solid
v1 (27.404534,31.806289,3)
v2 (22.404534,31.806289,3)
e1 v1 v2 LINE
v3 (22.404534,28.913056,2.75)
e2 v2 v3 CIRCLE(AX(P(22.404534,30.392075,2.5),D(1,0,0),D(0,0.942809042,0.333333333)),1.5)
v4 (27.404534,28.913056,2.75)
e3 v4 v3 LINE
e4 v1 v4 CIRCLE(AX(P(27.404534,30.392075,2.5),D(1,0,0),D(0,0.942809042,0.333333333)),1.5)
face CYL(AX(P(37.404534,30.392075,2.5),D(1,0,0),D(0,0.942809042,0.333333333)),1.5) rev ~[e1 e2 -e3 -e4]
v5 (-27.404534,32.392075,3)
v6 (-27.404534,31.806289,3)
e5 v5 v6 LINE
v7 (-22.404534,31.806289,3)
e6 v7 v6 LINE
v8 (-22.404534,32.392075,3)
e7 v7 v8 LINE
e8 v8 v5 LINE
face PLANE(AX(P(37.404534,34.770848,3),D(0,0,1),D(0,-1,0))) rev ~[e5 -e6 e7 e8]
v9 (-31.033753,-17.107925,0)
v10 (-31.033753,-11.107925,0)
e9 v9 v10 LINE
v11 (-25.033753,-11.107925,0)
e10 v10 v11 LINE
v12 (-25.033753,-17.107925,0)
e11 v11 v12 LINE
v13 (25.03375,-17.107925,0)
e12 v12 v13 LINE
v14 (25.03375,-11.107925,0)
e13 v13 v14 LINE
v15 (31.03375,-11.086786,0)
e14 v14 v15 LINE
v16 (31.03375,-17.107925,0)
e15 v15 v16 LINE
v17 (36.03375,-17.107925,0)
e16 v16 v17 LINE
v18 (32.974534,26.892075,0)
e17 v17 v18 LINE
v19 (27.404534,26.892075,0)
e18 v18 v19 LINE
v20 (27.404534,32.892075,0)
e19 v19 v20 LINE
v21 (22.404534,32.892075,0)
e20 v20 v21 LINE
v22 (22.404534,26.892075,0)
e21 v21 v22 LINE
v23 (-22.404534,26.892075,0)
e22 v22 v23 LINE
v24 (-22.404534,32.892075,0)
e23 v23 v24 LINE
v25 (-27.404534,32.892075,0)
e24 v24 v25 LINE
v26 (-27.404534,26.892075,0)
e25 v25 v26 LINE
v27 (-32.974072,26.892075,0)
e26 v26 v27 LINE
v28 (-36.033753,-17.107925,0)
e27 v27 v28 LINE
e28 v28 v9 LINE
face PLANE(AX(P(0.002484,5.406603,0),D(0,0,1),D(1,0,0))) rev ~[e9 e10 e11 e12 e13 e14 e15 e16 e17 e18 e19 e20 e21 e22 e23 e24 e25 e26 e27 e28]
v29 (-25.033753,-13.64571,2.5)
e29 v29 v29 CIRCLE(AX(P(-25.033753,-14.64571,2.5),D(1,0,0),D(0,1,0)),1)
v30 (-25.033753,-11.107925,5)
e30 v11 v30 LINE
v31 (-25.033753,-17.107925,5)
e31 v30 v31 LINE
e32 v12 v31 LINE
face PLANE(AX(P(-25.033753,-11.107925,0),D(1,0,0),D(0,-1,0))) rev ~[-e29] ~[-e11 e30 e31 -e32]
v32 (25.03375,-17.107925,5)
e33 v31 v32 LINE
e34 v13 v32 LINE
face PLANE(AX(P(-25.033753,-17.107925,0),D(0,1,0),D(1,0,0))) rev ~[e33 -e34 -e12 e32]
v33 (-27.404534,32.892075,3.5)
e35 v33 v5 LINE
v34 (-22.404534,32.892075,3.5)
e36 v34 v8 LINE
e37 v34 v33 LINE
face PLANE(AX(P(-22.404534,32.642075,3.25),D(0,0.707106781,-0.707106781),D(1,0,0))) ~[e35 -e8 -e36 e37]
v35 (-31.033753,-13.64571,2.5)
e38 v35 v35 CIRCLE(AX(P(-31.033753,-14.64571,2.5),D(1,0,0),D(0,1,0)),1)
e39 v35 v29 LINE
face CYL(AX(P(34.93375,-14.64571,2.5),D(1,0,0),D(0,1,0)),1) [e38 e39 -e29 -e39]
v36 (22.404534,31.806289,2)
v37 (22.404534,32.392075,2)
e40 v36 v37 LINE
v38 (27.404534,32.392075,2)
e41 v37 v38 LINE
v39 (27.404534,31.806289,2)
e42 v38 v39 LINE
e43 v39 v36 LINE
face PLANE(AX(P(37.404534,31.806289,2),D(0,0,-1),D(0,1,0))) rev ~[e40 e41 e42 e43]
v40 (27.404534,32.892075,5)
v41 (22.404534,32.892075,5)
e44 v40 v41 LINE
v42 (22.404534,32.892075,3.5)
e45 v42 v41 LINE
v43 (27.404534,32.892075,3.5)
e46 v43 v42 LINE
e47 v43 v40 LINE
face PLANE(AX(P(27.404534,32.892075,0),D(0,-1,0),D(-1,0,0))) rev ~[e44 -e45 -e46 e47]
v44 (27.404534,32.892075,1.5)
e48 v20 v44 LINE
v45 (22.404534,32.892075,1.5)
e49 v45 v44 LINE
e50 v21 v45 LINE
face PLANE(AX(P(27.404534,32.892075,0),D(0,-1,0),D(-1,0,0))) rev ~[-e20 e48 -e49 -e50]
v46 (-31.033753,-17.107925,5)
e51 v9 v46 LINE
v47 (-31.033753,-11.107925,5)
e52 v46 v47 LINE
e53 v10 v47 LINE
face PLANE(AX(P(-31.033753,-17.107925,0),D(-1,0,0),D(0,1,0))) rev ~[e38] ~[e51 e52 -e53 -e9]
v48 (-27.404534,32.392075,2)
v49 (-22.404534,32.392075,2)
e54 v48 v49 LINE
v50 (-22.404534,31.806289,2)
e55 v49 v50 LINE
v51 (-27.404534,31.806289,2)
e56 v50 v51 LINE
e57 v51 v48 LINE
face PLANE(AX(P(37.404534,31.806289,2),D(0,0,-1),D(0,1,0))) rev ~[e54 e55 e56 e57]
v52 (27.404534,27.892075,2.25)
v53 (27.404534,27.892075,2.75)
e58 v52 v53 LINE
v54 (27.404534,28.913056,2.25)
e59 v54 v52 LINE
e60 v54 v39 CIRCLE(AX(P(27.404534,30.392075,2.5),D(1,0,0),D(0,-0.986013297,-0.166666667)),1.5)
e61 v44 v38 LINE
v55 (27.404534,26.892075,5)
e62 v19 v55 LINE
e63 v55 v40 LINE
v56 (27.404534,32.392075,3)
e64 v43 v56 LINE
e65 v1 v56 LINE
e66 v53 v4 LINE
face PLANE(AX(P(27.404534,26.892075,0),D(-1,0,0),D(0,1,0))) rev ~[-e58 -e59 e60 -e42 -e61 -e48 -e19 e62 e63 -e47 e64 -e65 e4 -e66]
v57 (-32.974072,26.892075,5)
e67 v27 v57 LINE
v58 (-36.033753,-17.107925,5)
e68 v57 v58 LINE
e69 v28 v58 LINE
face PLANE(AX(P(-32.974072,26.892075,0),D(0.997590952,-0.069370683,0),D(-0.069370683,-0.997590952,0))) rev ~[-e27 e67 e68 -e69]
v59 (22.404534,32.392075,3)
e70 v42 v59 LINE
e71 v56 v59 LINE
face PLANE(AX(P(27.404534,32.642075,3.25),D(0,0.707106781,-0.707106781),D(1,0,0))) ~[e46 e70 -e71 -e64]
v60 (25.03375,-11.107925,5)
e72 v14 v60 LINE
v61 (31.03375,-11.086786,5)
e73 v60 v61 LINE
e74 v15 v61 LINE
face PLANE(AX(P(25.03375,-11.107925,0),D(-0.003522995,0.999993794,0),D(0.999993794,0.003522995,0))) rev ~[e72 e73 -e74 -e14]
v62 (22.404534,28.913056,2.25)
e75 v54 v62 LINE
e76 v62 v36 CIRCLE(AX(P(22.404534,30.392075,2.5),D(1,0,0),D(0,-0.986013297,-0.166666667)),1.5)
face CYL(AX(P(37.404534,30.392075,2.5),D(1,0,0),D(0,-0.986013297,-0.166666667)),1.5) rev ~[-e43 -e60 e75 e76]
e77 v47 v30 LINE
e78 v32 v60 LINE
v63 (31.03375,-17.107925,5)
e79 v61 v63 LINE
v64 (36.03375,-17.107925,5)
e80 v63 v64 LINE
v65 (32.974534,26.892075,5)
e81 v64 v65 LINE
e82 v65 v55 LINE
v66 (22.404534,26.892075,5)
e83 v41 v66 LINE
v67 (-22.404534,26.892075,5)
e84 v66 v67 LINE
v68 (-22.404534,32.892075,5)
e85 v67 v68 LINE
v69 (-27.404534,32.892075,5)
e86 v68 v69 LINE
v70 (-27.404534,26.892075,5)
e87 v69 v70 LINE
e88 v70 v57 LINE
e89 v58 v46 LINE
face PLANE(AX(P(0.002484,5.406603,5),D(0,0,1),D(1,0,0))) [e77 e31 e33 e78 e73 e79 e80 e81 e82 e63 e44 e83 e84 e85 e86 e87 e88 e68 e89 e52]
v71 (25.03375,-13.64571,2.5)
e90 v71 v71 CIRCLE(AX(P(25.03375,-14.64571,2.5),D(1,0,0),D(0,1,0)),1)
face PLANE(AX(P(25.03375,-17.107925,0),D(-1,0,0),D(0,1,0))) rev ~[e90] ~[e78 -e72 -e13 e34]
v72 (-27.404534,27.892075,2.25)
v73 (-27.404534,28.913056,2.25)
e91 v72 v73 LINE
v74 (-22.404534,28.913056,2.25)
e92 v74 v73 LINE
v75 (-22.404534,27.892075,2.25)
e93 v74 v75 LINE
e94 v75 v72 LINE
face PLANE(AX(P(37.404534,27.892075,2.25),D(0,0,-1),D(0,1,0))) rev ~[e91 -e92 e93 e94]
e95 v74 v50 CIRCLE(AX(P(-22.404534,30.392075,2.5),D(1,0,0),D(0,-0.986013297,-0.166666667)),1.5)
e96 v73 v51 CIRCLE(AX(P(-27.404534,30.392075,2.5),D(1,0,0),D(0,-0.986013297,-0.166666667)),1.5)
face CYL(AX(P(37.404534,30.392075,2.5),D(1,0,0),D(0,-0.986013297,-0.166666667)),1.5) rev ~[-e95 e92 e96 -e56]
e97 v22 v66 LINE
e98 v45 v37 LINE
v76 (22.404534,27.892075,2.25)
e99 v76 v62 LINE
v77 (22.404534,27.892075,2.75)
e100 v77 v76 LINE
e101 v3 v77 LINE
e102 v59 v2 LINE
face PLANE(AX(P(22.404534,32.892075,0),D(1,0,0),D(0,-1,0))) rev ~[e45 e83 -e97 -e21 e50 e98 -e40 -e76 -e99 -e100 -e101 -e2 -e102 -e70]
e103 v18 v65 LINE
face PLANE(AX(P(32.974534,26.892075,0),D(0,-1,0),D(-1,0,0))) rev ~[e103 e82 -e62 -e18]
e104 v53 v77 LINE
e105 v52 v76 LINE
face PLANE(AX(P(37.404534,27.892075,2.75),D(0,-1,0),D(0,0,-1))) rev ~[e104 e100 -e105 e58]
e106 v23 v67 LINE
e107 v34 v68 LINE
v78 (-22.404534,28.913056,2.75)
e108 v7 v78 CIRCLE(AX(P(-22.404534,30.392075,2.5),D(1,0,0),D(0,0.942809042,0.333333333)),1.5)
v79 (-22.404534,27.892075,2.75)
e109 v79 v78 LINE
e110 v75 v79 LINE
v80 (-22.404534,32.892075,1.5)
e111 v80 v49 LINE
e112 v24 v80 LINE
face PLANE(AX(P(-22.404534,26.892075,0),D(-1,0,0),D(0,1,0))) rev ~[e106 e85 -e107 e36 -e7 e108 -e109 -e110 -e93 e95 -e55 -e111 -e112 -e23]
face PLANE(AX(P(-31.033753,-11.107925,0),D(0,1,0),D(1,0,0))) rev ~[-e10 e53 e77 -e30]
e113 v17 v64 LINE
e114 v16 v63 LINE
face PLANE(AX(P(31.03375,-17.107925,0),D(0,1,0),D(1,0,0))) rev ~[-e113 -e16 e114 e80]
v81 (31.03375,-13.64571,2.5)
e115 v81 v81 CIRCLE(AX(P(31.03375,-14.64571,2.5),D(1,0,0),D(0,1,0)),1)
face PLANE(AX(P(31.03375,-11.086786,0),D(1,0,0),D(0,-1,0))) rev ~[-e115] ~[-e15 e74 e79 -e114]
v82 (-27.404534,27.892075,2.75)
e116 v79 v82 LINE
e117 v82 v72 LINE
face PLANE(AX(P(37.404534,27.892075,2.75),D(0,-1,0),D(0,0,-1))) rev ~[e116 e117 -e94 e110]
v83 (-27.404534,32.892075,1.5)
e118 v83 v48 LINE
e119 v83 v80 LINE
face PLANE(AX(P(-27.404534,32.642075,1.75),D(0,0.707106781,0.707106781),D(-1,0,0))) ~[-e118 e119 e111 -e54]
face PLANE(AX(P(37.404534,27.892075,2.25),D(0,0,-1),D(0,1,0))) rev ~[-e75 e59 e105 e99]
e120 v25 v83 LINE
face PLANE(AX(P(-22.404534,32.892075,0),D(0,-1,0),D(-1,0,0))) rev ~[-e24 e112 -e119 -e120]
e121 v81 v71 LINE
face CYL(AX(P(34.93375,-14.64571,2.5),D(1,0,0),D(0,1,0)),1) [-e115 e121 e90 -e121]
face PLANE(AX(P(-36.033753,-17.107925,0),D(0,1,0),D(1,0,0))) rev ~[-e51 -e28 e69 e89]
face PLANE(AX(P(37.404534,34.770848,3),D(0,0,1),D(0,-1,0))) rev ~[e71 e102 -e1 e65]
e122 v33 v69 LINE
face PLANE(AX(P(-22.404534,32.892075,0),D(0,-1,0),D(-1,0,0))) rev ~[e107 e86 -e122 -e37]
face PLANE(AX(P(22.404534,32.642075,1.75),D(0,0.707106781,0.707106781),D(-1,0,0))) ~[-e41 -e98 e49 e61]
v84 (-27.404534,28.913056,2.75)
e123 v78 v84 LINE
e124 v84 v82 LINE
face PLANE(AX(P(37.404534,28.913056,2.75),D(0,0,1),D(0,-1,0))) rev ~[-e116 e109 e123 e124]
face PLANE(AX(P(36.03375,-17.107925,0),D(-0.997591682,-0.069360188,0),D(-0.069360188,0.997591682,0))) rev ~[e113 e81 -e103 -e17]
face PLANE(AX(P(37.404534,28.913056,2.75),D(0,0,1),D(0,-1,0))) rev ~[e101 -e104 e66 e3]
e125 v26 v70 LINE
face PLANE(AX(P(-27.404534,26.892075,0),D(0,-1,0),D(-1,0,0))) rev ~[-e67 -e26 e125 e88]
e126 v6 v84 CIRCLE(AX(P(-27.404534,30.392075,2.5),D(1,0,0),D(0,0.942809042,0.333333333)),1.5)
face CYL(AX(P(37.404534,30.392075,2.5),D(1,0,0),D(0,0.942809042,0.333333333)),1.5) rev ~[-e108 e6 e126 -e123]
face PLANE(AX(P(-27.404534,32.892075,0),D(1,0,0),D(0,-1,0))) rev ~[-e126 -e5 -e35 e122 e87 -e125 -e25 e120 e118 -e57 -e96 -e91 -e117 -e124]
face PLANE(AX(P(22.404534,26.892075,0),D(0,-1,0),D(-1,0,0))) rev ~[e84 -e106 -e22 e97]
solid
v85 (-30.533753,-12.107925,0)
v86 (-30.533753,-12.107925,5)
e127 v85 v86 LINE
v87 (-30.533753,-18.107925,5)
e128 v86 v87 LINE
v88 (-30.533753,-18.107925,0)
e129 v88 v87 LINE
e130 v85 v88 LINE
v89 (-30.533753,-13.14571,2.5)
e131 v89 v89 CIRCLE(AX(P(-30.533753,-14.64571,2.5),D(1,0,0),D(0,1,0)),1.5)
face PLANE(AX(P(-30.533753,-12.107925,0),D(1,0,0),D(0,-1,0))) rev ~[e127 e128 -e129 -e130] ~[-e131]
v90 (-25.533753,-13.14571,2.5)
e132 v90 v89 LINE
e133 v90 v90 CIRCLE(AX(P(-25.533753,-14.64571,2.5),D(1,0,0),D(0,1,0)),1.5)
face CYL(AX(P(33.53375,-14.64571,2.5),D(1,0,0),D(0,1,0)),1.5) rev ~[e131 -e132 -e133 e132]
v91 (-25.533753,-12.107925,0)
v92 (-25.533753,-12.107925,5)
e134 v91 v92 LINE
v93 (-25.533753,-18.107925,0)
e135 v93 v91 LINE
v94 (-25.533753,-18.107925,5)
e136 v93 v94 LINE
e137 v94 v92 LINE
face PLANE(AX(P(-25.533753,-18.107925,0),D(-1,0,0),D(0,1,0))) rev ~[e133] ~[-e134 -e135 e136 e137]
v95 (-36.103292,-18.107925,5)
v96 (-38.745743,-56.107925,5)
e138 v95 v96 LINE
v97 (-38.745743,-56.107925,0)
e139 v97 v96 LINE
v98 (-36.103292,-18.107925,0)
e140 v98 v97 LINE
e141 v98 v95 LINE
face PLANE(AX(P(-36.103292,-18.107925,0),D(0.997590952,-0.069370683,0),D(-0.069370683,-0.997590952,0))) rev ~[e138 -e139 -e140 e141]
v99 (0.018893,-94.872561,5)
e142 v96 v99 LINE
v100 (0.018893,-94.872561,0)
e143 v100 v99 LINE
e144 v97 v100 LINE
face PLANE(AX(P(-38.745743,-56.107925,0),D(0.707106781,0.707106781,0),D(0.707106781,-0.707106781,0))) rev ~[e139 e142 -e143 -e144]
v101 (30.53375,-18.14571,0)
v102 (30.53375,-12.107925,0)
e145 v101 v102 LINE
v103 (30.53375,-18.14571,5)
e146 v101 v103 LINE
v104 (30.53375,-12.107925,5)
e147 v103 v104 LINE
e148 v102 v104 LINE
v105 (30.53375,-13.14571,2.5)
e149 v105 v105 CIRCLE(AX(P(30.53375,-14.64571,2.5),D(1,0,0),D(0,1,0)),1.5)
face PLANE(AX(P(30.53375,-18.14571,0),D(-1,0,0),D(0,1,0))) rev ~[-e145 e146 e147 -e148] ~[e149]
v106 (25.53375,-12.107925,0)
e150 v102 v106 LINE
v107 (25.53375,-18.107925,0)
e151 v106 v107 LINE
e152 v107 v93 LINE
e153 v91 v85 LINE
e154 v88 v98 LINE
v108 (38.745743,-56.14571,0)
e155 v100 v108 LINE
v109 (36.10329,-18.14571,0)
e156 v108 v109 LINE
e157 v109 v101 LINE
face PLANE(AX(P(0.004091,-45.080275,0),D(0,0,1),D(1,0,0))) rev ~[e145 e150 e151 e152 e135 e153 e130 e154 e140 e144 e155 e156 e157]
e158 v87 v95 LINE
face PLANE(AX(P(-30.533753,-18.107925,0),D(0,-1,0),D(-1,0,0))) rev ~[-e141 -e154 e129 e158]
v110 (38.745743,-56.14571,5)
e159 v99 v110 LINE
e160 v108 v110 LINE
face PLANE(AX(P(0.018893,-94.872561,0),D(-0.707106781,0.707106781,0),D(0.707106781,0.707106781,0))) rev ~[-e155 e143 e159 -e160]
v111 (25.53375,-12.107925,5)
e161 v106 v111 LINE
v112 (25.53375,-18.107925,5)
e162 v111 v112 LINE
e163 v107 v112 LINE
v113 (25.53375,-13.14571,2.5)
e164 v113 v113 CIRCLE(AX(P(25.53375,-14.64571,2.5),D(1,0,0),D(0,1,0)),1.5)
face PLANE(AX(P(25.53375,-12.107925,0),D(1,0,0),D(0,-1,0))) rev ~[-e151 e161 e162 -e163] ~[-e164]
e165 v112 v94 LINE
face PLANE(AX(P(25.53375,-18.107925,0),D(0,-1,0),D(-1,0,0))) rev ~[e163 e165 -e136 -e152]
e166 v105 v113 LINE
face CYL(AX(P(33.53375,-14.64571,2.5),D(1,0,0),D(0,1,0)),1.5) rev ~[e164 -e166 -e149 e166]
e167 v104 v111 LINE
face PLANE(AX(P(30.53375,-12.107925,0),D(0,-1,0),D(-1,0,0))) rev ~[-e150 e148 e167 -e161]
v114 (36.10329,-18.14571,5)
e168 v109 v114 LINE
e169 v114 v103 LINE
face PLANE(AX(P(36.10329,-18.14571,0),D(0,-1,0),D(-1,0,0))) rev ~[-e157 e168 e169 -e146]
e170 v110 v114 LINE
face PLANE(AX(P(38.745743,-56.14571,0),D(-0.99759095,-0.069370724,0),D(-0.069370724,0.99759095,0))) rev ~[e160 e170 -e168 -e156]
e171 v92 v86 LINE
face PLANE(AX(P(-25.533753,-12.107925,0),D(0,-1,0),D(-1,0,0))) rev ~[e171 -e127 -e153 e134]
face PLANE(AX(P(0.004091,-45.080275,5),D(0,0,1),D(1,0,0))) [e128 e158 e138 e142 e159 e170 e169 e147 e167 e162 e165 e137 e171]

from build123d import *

# Parameters (mm, degrees)
F1_DEPTH = 5
F4_DEPTH = 72.8
F5_SIZE  = 0.5
F8_START = -7
F7_R     = 1.5
F7_R_2   = 1
F8_DEPTH = 68.5
F9_START = -5.6
F9_DEPTH = 68.7


with BuildPart() as f1:
    # F0 (on Top) → F1 (new body)
    with BuildSketch(Plane.XY):
        Polygon((-36.1032915569, -18.1079245215), (-38.7457432998, -56.1079245215), (0.0188927832, -94.8725606045), (38.7457432998, -56.145710088), (36.10329, -18.1457101963), (30.53375, -18.1457101963), (30.53375, -12.1079245215), (25.53375, -12.1079245215), (25.53375, -17.1079245215), (25.53375, -18.1079245215), (-25.5337533532, -18.1079245215), (-25.5337533532, -12.1079245215), (-30.5337533532, -12.1079245215), (-30.5337533532, -18.1079245215), align=None)
    extrude(amount=F1_DEPTH)

    # F7 (on offset) → F8 (cut)
    with BuildSketch(Plane.YZ.offset(40.53375).offset(F8_START)):
        with Locations((-14.6457101963, 2.5)):
            Circle(F7_R)
        with Locations((-14.6457101963, 2.5)):
            Circle(F7_R_2, mode=Mode.SUBTRACT)
    extrude(amount=-F8_DEPTH, mode=Mode.SUBTRACT)



with BuildPart() as f1b:
    # F0 (on Top) → F1, piece 2 (new body)
    with BuildSketch(Plane.XY):
        Polygon((-36.0337533532, -17.1079245215), (-31.0337533532, -17.1079245215), (-31.0337533532, -11.1079245215), (-25.0337533532, -11.1079245215), (-25.0337533532, -17.1079245215), (25.03375, -17.1079245215), (25.03375, -11.1079245215), (31.03375, -11.0867864177), (31.03375, -17.1079245215), (36.03375, -17.1079245215), (32.974534184, 26.8920754785), (27.404534184, 26.8920754785), (27.404534184, 32.8920754785), (22.404534184, 32.8920754785), (22.404534184, 26.8920754785), (-22.404534184, 26.8920754785), (-22.404534184, 32.8920754785), (-27.404534184, 32.8920754785), (-27.404534184, 26.8920754785), (-32.9740723878, 26.8920754785), align=None)
    extrude(amount=F1_DEPTH)

    # F3 (on offset) → F4 (cut)
    with BuildSketch(Plane.YZ.offset(37.404534184)):
        with BuildLine():
            Line((34.7708482201, 3), (31.8062890408, 3))
            ThreePointArc((31.8062890408, 3), (30.2629438912, 3.9944313411), (28.9130555327, 2.75))
            Line((28.9130555327, 2.75), (27.8920754785, 2.75))
            Line((27.8920754785, 2.75), (27.8920754785, 2.25))
            Line((27.8920754785, 2.25), (28.9130555327, 2.25))
            ThreePointArc((28.9130555327, 2.25), (30.2629438912, 1.0055686589), (31.8062890408, 2))
            Line((31.8062890408, 2), (34.7708482201, 2))
            Line((34.7708482201, 2), (34.7708482201, 3))
        make_face()
    extrude(amount=-F4_DEPTH, mode=Mode.SUBTRACT)

    # F5
    f5_edges = [f1b.edges().sort_by_distance(p)[0] for p in [
        (24.904534, 32.892075, 3),
        (24.904534, 32.892075, 2),
        (-24.904534, 32.892075, 3),
        (-24.904534, 32.892075, 2),
    ]]
    chamfer(f5_edges, length=F5_SIZE)


with BuildPart() as f1_1:
    add(f1.part)

    add(f1b.part)  # F9 merges F1b
    # F7 (on offset) → F9 (join)
    with BuildSketch(Plane.YZ.offset(40.53375).offset(F9_START)):
        with Locations((-14.6457101963, 2.5)):
            Circle(F7_R_2)
    extrude(amount=-F9_DEPTH)


solid = f1_1.part
